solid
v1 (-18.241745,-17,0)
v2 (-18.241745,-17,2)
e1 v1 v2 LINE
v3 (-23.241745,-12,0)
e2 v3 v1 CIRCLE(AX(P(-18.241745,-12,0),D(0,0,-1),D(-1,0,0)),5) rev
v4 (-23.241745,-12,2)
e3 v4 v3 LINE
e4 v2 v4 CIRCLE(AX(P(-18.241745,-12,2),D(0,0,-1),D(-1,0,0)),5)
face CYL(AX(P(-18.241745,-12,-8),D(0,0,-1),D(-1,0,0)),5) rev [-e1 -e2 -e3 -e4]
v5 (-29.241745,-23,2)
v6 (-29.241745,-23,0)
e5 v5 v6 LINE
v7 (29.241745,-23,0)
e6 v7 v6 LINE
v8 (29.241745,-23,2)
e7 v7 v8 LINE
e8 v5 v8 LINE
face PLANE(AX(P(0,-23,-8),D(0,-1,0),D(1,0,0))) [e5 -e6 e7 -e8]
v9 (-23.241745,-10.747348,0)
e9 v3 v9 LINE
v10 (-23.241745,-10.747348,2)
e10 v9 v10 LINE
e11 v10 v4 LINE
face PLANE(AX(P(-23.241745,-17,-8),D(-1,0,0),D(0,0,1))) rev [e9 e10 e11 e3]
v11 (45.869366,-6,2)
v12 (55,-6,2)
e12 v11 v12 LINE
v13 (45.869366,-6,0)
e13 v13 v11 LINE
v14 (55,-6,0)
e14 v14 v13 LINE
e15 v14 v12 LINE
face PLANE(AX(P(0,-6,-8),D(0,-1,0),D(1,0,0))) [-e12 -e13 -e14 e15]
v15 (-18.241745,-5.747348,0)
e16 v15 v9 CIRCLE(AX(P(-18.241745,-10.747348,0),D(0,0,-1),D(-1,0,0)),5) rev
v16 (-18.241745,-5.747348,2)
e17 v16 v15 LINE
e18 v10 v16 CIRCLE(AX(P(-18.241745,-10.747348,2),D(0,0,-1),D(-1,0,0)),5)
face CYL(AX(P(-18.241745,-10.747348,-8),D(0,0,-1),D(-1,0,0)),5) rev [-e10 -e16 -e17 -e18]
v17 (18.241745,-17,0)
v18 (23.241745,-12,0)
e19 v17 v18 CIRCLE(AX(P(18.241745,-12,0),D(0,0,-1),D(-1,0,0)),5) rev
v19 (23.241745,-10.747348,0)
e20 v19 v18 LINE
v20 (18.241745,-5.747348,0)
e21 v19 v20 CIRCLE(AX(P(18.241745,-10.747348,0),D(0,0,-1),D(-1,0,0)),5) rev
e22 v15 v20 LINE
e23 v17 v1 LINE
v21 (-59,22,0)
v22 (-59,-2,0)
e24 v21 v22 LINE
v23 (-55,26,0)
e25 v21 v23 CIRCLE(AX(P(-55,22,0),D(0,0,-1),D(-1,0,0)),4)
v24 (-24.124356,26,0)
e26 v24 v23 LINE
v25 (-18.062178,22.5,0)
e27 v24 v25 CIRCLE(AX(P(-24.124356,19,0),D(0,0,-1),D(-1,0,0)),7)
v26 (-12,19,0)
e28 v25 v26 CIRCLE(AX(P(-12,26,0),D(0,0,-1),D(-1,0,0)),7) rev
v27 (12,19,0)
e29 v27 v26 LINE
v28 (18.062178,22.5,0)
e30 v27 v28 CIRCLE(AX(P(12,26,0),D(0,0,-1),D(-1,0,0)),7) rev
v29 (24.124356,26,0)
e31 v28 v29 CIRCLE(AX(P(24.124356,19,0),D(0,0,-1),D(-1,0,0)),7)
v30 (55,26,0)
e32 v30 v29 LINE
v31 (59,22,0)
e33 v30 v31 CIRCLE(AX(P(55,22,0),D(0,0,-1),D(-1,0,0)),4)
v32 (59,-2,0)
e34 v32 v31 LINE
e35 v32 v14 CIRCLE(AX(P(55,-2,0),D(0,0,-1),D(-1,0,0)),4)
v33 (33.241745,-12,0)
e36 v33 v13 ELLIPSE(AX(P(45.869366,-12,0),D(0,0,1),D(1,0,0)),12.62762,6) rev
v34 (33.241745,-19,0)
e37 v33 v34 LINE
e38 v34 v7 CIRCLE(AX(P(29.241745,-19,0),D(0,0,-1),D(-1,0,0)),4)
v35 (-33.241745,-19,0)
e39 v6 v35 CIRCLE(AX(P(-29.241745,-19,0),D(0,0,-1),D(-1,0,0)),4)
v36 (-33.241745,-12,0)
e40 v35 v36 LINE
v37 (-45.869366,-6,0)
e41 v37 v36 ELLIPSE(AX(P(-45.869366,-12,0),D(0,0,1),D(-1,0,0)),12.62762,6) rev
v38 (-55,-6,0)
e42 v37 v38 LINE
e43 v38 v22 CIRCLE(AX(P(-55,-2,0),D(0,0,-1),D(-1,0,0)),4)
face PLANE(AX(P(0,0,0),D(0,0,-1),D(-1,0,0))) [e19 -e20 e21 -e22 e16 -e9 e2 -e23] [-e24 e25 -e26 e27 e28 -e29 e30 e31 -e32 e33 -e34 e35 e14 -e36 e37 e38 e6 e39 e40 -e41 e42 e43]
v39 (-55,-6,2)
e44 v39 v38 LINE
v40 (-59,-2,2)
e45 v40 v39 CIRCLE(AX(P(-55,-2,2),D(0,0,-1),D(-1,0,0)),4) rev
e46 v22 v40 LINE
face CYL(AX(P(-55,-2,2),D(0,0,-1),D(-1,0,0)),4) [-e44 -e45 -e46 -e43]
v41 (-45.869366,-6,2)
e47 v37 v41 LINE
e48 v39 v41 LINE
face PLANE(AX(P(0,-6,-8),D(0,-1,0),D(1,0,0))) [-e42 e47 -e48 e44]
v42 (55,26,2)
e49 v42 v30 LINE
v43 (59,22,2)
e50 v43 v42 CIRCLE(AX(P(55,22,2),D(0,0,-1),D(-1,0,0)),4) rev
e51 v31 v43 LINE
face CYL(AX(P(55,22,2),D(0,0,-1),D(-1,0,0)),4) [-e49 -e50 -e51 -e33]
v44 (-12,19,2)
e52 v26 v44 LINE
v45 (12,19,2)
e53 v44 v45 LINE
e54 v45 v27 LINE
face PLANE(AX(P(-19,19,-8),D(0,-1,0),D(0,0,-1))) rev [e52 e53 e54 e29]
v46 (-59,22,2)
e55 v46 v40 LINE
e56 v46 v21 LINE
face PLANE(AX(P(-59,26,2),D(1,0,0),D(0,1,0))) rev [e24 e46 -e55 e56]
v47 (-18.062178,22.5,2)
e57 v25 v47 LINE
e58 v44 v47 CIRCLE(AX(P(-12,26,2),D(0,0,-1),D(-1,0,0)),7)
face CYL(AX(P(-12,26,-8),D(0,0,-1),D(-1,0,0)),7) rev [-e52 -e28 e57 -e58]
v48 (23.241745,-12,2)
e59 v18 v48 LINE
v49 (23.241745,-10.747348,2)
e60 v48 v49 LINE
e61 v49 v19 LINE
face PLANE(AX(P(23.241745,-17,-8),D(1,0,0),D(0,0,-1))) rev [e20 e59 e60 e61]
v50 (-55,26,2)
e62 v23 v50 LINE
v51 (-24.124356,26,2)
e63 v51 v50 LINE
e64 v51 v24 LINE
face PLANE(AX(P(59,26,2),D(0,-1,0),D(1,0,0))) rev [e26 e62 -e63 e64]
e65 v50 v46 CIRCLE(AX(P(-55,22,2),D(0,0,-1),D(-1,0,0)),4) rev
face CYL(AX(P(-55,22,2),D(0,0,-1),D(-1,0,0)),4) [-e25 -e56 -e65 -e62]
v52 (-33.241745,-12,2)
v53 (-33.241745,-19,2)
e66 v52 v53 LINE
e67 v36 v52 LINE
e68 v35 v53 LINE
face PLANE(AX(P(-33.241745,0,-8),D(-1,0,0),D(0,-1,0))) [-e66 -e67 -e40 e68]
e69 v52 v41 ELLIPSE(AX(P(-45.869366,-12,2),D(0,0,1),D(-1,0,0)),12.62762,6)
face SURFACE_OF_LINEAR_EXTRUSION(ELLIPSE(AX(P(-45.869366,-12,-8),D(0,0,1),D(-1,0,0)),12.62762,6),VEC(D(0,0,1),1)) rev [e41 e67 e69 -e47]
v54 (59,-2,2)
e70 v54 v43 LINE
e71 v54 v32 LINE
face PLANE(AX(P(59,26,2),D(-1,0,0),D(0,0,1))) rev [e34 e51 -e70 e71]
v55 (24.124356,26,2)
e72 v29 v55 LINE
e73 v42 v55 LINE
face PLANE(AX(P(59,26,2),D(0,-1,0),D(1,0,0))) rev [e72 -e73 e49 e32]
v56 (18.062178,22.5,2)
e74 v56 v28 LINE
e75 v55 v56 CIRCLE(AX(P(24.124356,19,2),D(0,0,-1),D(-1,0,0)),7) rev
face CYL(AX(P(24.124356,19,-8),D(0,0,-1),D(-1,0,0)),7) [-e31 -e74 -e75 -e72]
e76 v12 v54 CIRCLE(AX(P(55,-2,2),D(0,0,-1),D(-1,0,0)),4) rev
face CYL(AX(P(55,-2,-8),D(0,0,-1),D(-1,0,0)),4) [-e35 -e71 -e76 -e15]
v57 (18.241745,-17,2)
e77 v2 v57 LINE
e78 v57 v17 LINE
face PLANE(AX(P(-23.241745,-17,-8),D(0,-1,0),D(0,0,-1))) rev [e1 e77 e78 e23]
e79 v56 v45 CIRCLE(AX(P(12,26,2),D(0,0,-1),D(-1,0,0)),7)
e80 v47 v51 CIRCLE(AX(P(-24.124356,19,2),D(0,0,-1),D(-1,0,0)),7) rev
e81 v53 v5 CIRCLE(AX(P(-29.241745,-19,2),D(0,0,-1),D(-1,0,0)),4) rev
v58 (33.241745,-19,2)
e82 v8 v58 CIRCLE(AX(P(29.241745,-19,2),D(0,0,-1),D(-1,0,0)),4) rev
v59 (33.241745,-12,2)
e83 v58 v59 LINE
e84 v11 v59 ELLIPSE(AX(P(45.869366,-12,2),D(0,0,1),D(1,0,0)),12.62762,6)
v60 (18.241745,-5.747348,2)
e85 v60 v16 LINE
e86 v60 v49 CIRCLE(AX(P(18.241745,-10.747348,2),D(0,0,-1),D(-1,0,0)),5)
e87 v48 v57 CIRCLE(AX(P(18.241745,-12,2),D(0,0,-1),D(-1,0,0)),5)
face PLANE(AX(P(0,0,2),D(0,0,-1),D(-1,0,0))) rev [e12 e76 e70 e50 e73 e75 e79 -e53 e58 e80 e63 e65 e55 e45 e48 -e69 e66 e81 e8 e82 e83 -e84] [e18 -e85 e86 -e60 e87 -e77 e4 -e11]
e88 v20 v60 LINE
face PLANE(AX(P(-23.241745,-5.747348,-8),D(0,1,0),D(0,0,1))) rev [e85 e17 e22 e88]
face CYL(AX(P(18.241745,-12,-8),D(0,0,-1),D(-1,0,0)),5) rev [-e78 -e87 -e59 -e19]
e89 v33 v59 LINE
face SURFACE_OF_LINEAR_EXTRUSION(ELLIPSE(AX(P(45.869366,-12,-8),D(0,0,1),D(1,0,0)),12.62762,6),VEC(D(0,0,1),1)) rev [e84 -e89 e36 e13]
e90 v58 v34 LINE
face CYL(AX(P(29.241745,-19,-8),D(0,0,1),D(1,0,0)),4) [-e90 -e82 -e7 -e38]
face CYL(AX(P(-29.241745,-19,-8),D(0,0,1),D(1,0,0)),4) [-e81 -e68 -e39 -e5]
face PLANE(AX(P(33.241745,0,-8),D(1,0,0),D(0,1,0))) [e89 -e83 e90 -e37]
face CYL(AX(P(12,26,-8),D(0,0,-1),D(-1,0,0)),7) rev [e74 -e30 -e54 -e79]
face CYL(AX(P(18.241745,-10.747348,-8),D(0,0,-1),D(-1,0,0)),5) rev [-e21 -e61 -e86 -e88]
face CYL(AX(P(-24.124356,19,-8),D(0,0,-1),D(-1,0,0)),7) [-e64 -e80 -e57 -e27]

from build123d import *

# Parameters (mm, degrees)
SKETCH1_W           = 118
SKETCH1_H           = 52
BOSS_EXTRUDE1_DEPTH = 2
CUT_EXTRUDE1_DEPTH  = 10
SKETCH4_W           = 38
SKETCH4_H           = 7
CUT_EXTRUDE2_DEPTH  = 10
SKETCH5_W           = 46.483490982
SKETCH5_H           = 11.25265215
CUT_EXTRUDE3_DEPTH  = 10
FILLET1_R           = 5
FILLET2_R           = 7
FILLET3_R           = 7
FILLET4_R           = 4
FILLET5_R           = 4


with BuildPart() as part:
    # Sketch1 → Boss-Extrude1 (new body)
    with BuildSketch(Plane.XY):
        Rectangle(SKETCH1_W, SKETCH1_H)
    extrude(amount=BOSS_EXTRUDE1_DEPTH)

    # Sketch3 → Cut-Extrude1 (cut)
    with BuildSketch(Plane.XY.offset(2)):
        with BuildLine():
            Line((-33.241745491, -23), (-33.241745491, -12))
            add(Edge.make_bspline(
                [(-33.241745491, -12), (-33.241745491, -6), (-45.86936562, -6)],
                knots=[3.141592654, 3.141592654, 3.141592654, 4.71238898, 4.71238898, 4.71238898], degree=2, weights=[1, 0.707106781, 1]))
            Line((-45.86936562, -6), (-59, -6))
            Line((-59, -6), (-59, -26))
            Line((-59, -26), (59, -26))
            Line((59, -26), (59, -6))
            Line((59, -6), (45.86936562, -6))
            add(Edge.make_bspline(
                [(45.86936562, -6), (33.241745491, -6), (33.241745491, -12)],
                knots=[1.570796327, 1.570796327, 1.570796327, 3.141592654, 3.141592654, 3.141592654], degree=2, weights=[1, 0.707106781, 1]))
            Line((33.241745491, -12), (33.241745491, -23))
            Line((33.241745491, -23), (-33.241745491, -23))
        make_face()
    extrude(amount=-CUT_EXTRUDE1_DEPTH, mode=Mode.SUBTRACT)

    # Sketch4 → Cut-Extrude2 (cut)
    with BuildSketch(Plane.XY.offset(2)):
        with Locations((0, 22.5)):
            Rectangle(SKETCH4_W, SKETCH4_H)
    extrude(amount=-CUT_EXTRUDE2_DEPTH, mode=Mode.SUBTRACT)

    # Sketch5 → Cut-Extrude3 (cut)
    with BuildSketch(Plane.XY.offset(2)):
        with Locations((0, -11.373673925)):
            Rectangle(SKETCH5_W, SKETCH5_H)
    extrude(amount=-CUT_EXTRUDE3_DEPTH, mode=Mode.SUBTRACT)

    # Fillet1
    fillet1_edges = [part.edges().sort_by_distance(p)[0] for p in [
        (-23.241745491, -17, 1),
        (-23.241745491, -5.74734785, 1),
        (23.241745491, -5.74734785, 1),
        (23.241745491, -17, 1),
    ]]
    fillet(fillet1_edges, radius=FILLET1_R)

    # Fillet2
    fillet2_edges = [part.edges().sort_by_distance(p)[0] for p in [
        (19, 19, 1),
        (-19, 19, 1),
    ]]
    fillet(fillet2_edges, radius=FILLET2_R - 0.0001)  # a hair under: the kernel refuses the full size

    # Fillet3
    fillet3_edges = [part.edges().sort_by_distance(p)[0] for p in [
        (19, 26, 1),
        (-19, 26, 1),
    ]]
    fillet(fillet3_edges, radius=FILLET3_R)

    # Fillet4
    fillet4_edges = [part.edges().sort_by_distance(p)[0] for p in [
        (59, -6, 1),
        (-59, -6, 1),
        (-33.241745491, -23, 1),
        (33.241745491, -23, 1),
    ]]
    fillet(fillet4_edges, radius=FILLET4_R)

    # Fillet5
    fillet5_edges = [part.edges().sort_by_distance(p)[0] for p in [
        (-59, 26, 1),
        (59, 26, 1),
    ]]
    fillet(fillet5_edges, radius=FILLET5_R)


solid = part.part
